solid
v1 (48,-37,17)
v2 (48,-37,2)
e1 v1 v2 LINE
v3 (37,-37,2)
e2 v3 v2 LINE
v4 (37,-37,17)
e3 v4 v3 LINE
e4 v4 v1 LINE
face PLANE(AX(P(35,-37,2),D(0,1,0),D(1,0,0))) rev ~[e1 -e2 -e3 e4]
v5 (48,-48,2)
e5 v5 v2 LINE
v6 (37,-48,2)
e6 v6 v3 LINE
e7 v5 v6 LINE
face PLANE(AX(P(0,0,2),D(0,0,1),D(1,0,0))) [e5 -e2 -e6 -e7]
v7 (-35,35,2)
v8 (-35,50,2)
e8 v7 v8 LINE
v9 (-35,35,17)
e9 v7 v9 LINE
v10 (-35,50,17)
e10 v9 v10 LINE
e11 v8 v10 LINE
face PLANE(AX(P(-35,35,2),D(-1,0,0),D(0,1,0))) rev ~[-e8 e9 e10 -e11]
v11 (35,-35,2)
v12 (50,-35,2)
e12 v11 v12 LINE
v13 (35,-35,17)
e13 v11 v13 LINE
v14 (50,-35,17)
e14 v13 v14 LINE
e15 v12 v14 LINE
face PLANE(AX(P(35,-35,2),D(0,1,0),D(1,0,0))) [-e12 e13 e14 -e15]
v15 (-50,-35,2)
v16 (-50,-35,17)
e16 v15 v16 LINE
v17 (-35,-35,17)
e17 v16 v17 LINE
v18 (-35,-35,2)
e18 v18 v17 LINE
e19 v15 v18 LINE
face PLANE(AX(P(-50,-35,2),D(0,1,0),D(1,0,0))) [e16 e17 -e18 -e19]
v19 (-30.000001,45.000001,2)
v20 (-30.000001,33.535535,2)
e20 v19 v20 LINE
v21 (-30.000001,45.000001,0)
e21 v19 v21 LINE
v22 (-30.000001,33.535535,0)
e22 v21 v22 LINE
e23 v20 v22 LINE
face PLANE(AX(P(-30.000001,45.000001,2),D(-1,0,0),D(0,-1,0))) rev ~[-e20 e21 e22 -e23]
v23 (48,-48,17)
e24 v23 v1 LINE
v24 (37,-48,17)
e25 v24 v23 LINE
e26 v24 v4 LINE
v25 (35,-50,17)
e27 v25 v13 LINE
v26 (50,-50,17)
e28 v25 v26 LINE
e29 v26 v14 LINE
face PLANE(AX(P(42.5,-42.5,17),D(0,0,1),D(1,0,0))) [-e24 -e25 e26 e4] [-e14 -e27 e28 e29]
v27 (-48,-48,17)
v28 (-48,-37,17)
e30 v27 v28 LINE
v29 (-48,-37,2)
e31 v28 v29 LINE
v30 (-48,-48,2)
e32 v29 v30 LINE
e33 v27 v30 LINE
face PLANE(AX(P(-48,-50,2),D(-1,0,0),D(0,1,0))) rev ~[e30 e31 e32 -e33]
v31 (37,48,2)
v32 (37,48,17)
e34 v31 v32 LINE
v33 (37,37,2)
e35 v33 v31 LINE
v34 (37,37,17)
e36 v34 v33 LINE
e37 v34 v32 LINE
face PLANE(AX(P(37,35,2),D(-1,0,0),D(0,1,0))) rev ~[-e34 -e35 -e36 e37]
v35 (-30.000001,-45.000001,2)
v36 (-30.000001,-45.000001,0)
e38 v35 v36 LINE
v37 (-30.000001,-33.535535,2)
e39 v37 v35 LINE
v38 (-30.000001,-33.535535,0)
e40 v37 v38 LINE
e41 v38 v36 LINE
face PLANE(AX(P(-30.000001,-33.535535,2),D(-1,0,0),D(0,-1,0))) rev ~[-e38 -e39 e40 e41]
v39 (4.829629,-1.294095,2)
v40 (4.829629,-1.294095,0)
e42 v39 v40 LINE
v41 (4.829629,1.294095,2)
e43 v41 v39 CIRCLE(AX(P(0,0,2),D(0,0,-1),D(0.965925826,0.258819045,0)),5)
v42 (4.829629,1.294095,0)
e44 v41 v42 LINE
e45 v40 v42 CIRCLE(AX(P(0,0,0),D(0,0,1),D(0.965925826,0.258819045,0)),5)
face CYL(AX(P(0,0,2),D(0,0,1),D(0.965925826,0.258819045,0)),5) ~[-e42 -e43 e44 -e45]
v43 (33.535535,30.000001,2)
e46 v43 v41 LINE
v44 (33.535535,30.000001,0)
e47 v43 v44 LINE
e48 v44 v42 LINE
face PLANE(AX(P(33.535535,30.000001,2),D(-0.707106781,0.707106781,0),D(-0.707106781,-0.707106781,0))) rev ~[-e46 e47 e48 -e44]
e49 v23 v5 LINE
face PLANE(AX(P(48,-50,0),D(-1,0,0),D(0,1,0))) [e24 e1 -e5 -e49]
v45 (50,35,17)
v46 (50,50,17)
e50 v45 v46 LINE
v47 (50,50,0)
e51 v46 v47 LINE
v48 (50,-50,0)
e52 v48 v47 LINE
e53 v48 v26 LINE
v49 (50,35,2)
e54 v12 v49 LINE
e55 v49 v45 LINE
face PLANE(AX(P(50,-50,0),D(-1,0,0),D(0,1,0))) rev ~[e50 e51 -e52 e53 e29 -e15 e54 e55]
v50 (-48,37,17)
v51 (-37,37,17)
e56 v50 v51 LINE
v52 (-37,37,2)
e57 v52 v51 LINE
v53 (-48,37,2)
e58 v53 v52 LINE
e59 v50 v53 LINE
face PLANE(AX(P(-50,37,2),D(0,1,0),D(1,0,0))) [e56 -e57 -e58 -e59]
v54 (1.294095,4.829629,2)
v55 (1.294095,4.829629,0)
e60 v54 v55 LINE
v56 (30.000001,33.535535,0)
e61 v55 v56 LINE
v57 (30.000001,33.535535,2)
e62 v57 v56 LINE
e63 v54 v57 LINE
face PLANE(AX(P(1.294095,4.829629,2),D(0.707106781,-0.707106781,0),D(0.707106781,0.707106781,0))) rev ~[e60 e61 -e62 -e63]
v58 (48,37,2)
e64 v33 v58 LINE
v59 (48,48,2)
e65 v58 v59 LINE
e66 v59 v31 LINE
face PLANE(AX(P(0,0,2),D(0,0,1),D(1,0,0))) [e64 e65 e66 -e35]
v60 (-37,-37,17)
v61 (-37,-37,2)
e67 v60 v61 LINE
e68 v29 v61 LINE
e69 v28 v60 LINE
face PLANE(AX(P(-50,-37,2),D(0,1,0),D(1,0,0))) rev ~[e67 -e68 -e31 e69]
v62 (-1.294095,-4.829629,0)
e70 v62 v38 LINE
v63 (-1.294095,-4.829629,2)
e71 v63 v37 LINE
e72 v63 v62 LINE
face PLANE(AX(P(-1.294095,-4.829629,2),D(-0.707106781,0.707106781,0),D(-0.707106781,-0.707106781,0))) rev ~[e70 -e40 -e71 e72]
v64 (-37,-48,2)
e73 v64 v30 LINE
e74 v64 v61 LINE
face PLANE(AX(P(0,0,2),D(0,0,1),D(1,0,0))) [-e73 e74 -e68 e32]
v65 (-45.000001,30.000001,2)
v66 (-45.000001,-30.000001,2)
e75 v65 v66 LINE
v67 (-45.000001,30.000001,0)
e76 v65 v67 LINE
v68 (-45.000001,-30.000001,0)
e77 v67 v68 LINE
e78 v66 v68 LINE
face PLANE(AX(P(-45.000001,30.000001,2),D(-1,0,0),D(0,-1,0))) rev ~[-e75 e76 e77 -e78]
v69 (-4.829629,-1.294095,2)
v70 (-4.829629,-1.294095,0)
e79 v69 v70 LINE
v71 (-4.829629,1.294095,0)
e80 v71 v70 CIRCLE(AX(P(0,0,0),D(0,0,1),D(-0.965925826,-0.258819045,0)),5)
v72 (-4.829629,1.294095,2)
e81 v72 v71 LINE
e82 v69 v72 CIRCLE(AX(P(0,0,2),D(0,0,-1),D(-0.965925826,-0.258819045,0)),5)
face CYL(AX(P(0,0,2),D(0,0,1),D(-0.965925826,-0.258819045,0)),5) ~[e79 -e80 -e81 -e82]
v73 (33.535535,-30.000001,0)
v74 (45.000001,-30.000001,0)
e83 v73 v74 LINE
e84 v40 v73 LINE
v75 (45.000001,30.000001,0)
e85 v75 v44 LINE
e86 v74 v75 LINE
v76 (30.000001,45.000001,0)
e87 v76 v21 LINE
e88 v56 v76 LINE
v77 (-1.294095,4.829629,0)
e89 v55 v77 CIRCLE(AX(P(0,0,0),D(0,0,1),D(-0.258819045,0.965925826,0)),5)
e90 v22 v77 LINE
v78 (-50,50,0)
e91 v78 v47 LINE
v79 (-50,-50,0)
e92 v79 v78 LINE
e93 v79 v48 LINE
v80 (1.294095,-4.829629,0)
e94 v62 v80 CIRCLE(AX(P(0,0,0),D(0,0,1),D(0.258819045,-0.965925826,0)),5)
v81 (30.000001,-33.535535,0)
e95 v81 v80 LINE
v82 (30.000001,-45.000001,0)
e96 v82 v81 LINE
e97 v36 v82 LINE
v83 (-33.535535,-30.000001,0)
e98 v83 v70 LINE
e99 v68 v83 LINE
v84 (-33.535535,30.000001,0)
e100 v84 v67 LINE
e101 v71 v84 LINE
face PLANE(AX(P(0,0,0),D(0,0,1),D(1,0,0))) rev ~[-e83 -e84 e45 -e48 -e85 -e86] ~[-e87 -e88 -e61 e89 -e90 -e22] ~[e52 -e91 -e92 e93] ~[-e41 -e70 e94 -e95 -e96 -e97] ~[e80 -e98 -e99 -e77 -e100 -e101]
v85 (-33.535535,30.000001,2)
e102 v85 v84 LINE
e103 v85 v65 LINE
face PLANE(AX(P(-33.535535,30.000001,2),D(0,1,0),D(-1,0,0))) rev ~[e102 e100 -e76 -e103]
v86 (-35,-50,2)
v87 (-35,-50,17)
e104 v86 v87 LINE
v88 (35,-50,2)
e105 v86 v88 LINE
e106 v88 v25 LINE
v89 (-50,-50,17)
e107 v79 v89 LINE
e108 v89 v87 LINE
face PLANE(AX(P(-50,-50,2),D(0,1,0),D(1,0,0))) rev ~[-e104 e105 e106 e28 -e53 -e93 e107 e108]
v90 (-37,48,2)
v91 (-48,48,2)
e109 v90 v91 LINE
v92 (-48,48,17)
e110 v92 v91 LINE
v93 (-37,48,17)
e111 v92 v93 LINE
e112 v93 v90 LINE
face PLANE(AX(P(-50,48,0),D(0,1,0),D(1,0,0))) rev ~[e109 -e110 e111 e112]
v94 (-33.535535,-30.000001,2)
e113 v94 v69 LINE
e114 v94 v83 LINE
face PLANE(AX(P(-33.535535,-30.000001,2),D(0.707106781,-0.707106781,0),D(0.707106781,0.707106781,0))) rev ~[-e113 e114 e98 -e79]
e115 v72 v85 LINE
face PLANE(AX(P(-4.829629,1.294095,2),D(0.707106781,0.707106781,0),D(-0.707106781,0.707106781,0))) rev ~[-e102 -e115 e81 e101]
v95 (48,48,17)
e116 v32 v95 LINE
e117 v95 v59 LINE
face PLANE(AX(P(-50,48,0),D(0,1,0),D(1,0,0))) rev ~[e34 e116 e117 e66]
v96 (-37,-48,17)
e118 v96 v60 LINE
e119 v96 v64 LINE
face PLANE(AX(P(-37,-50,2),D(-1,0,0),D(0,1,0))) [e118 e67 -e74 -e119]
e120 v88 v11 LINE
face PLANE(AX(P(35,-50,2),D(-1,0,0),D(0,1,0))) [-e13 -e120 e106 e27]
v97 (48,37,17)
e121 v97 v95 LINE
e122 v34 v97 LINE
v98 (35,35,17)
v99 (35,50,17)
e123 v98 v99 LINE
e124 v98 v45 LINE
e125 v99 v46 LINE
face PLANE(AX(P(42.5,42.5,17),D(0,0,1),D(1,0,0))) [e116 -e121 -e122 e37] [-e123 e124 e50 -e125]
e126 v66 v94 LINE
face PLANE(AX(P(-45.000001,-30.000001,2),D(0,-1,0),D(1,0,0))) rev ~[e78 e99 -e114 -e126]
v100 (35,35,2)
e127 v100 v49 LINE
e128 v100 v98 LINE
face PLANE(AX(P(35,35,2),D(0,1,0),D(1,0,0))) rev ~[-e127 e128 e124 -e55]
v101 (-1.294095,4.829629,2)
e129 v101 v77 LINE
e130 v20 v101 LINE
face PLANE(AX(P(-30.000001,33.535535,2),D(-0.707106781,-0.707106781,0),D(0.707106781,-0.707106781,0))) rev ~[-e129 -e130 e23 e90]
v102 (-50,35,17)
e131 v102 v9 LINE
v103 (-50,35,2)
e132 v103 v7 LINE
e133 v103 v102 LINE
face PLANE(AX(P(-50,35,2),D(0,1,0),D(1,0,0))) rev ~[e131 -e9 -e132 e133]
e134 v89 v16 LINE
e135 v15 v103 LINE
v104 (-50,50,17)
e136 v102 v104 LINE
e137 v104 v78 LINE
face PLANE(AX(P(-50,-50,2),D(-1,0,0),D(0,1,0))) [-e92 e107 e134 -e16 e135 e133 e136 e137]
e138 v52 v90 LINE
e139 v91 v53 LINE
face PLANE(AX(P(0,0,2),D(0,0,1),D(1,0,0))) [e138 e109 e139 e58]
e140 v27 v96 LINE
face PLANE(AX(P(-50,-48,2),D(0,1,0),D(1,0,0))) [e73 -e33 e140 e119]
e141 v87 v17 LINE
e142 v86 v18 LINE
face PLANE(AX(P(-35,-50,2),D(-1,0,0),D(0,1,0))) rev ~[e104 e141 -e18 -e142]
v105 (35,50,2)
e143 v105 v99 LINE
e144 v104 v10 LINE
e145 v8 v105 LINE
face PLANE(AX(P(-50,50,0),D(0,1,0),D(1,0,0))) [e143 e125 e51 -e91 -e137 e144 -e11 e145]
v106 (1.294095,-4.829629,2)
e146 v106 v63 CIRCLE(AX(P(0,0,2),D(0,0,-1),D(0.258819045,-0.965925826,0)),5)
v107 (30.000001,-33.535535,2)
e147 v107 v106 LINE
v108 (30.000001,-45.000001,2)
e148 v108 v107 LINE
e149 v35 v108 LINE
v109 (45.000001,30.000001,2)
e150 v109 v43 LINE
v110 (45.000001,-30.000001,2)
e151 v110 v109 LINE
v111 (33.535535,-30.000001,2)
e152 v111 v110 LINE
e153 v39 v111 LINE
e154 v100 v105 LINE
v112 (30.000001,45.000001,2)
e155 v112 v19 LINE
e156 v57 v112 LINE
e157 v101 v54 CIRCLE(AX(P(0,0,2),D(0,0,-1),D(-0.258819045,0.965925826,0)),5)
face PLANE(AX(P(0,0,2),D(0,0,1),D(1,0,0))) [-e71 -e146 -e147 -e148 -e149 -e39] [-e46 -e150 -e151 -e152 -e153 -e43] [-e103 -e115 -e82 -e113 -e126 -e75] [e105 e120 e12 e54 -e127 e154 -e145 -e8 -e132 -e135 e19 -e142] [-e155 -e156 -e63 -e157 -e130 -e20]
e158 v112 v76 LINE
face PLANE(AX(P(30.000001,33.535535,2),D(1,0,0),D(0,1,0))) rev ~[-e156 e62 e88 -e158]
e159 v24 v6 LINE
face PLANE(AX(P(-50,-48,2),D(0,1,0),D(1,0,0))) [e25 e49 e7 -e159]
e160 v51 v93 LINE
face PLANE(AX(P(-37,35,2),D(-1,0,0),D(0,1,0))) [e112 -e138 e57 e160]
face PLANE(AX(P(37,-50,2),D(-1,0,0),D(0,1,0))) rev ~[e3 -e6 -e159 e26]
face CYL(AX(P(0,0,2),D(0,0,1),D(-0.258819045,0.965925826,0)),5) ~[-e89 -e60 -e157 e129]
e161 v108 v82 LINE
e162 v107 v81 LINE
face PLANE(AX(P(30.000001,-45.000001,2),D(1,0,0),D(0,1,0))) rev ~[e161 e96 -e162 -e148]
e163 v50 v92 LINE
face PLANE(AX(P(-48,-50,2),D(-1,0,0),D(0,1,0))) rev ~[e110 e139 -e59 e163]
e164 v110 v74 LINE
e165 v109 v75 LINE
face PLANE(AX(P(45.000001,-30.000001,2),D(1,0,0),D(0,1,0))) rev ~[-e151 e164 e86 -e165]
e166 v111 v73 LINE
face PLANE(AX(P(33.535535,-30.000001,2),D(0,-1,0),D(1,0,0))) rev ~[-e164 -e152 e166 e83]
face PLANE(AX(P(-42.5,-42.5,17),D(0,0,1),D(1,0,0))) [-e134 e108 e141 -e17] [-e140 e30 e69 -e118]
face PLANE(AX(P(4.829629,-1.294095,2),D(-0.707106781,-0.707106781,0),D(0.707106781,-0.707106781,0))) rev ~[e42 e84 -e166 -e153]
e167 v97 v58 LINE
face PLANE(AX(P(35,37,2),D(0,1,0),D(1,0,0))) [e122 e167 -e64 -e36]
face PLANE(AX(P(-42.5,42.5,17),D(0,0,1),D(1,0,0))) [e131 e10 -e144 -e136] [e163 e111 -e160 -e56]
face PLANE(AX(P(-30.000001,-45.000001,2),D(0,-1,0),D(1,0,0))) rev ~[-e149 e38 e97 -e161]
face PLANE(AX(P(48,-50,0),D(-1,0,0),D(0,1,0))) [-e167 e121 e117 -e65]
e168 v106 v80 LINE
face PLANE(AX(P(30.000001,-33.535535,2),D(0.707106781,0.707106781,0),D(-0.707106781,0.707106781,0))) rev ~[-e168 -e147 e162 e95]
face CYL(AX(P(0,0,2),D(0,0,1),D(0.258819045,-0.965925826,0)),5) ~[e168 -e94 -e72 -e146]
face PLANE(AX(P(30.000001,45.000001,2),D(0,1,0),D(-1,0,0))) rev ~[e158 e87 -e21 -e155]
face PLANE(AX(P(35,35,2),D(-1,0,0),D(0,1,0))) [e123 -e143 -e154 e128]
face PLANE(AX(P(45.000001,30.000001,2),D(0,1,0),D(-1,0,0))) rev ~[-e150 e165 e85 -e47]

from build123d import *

# Parameters (mm, degrees)
F0_W        = 100
F0_H        = 100
F1_DEPTH    = 2
F2_W        = 15
F2_H        = 15
F3_DEPTH    = 15
F4_T        = 2
F4_T3_DEPTH = 19
F4_T5_DEPTH = 19
F4_T7_DEPTH = 19
F4_T9_DEPTH = 19
F6_DEPTH    = 2.001


# Not quite as in the source:
# - a shell that OpenCascade refuses in one call is made with other operations: the cavity is built on its own and cut out


with BuildPart() as f1:
    # F0 (on Top) → F1 (new body)
    with BuildSketch(Plane.XY):
        Rectangle(F0_W, F0_H)
    extrude(amount=F1_DEPTH)

    # F2 (on face) → F3 (join)
    with BuildSketch(Plane.XY.offset(2)):
        with Locations((-42.5, -42.5)):
            Rectangle(F2_W, F2_H)
        with Locations((-42.5, 42.5)):
            Rectangle(F2_W, F2_H)
        with Locations((42.5, 42.5)):
            Rectangle(F2_W, F2_H)
        with Locations((42.5, -42.5)):
            Rectangle(F2_W, F2_H)
    extrude(amount=F3_DEPTH)

    # F4: shell of thickness 2, made by hand


with BuildPart() as f4_core1:
    # F4_t2: copy of F1
    add(f1.part)

    # the walls: a layer under each face that stays
    f4_faces = [f4_core1.faces().sort_by_distance(p)[0] for p in [
        (50, -42.8571428571, 15.7857142857),
        (0, 0, 0),
        (-50, 42.8571428571, 15.7857142857),
        (-35, -42.5, 9.5),
        (-42.5, -35, 9.5),
        (-42.5, 35, 9.5),
        (-35, 42.5, 9.5),
        (42.8571428571, 50, 15.7857142857),
        (35, 42.5, 9.5),
        (42.5, 35, 9.5),
        (0, 0, 2),
        (35, -42.5, 9.5),
        (42.5, -35, 9.5),
        (-42.8571428571, -50, 15.7857142857),
    ]]
    thicken(f4_faces, amount=-F4_T, mode=Mode.SUBTRACT)

    # F4_s4 → F4_t3 (cut)
    with BuildSketch(Plane.XZ.offset(33)):
        Polygon((-34.98, 2.02), (-37, 2), (-37, 0), (-35, 0), align=None)
        Polygon((34.98, 2.02), (35, 0), (37, 0), (37, 2), align=None)
    extrude(amount=F4_T3_DEPTH, mode=Mode.SUBTRACT)

    # F4_s6 → F4_t5 (cut)
    with BuildSketch(Plane.YZ.offset(-52)):
        Polygon((-34.98, 2.02), (-37, 2), (-37, 0), (-35, 0), align=None)
        Polygon((34.98, 2.02), (37, 2), (37, 0), (35, 0), align=None)
    extrude(amount=F4_T5_DEPTH, mode=Mode.SUBTRACT)

    # F4_s8 → F4_t7 (cut)
    with BuildSketch(Plane.XZ.offset(-52)):
        Polygon((-34.98, 2.02), (-37, 2), (-37, 0), (-35, 0), align=None)
        Polygon((34.98, 2.02), (37, 2), (37, 0), (35, 0), align=None)
    extrude(amount=F4_T7_DEPTH, mode=Mode.SUBTRACT)

    # F4_s10 → F4_t9 (cut)
    with BuildSketch(Plane.YZ.offset(33)):
        Polygon((34.98, 2.02), (37, 2), (37, 0), (35, 0), align=None)
        Polygon((-34.98, 2.02), (-35, 0), (-37, 0), (-37, 2), align=None)
    extrude(amount=F4_T9_DEPTH, mode=Mode.SUBTRACT)


with BuildPart() as f1_1:
    add(f1.part)

    # what is left inside the walls is the cavity
    f4_cavity = [f4_core1.part.solids().sort_by_distance(p)[0] for p in [
        (47.98, -42.5, 12),
        (47.98, 42.5, 12),
        (-42.5, -47.98, 12),
        (-37.02, 42.5, 12),
    ]]
    add(f4_cavity, mode=Mode.SUBTRACT)

    # F5 (on face) → F6 (cut, through all)
    with BuildSketch(Plane.XY.offset(2)):
        with BuildLine():
            Line((-30.0000010431, -45.0000010431), (30.0000010431, -45.0000010431))
            Line((30.0000010431, -45.0000010431), (30.0000010431, -33.535534949))
            Line((30.0000010431, -33.535534949), (1.2940952255, -4.8296291314))
            ThreePointArc((1.2940952255, -4.8296291314), (0, -5), (-1.2940952255, -4.8296291314))
            Line((-1.2940952255, -4.8296291314), (-30.0000010431, -33.535534949))
            Line((-30.0000010431, -33.535534949), (-30.0000010431, -45.0000010431))
        make_face()
        with BuildLine():
            Line((-33.535534949, 30.0000010431), (-45.0000010431, 30.0000010431))
            Line((-45.0000010431, 30.0000010431), (-45.0000010431, -30.0000010431))
            Line((-45.0000010431, -30.0000010431), (-33.535534949, -30.0000010431))
            Line((-33.535534949, -30.0000010431), (-4.8296291314, -1.2940952255))
            ThreePointArc((-4.8296291314, -1.2940952255), (-5, 0), (-4.8296291314, 1.2940952255))
            Line((-4.8296291314, 1.2940952255), (-33.535534949, 30.0000010431))
        make_face()
        with BuildLine():
            Line((30.0000010431, 45.0000010431), (-30.0000010431, 45.0000010431))
            Line((-30.0000010431, 45.0000010431), (-30.0000010431, 33.535534949))
            Line((-30.0000010431, 33.535534949), (-1.2940952255, 4.8296291314))
            ThreePointArc((-1.2940952255, 4.8296291314), (0, 5), (1.2940952255, 4.8296291314))
            Line((1.2940952255, 4.8296291314), (30.0000010431, 33.535534949))
            Line((30.0000010431, 33.535534949), (30.0000010431, 45.0000010431))
        make_face()
        with BuildLine():
            Line((45.0000010431, -30.0000010431), (45.0000010431, 30.0000010431))
            Line((45.0000010431, 30.0000010431), (33.535534949, 30.0000010431))
            Line((33.535534949, 30.0000010431), (4.8296291314, 1.2940952255))
            ThreePointArc((4.8296291314, 1.2940952255), (5, 0), (4.8296291314, -1.2940952255))
            Line((4.8296291314, -1.2940952255), (33.535534949, -30.0000010431))
            Line((33.535534949, -30.0000010431), (45.0000010431, -30.0000010431))
        make_face()
    extrude(amount=-F6_DEPTH, mode=Mode.SUBTRACT)


solid = f1_1.part
